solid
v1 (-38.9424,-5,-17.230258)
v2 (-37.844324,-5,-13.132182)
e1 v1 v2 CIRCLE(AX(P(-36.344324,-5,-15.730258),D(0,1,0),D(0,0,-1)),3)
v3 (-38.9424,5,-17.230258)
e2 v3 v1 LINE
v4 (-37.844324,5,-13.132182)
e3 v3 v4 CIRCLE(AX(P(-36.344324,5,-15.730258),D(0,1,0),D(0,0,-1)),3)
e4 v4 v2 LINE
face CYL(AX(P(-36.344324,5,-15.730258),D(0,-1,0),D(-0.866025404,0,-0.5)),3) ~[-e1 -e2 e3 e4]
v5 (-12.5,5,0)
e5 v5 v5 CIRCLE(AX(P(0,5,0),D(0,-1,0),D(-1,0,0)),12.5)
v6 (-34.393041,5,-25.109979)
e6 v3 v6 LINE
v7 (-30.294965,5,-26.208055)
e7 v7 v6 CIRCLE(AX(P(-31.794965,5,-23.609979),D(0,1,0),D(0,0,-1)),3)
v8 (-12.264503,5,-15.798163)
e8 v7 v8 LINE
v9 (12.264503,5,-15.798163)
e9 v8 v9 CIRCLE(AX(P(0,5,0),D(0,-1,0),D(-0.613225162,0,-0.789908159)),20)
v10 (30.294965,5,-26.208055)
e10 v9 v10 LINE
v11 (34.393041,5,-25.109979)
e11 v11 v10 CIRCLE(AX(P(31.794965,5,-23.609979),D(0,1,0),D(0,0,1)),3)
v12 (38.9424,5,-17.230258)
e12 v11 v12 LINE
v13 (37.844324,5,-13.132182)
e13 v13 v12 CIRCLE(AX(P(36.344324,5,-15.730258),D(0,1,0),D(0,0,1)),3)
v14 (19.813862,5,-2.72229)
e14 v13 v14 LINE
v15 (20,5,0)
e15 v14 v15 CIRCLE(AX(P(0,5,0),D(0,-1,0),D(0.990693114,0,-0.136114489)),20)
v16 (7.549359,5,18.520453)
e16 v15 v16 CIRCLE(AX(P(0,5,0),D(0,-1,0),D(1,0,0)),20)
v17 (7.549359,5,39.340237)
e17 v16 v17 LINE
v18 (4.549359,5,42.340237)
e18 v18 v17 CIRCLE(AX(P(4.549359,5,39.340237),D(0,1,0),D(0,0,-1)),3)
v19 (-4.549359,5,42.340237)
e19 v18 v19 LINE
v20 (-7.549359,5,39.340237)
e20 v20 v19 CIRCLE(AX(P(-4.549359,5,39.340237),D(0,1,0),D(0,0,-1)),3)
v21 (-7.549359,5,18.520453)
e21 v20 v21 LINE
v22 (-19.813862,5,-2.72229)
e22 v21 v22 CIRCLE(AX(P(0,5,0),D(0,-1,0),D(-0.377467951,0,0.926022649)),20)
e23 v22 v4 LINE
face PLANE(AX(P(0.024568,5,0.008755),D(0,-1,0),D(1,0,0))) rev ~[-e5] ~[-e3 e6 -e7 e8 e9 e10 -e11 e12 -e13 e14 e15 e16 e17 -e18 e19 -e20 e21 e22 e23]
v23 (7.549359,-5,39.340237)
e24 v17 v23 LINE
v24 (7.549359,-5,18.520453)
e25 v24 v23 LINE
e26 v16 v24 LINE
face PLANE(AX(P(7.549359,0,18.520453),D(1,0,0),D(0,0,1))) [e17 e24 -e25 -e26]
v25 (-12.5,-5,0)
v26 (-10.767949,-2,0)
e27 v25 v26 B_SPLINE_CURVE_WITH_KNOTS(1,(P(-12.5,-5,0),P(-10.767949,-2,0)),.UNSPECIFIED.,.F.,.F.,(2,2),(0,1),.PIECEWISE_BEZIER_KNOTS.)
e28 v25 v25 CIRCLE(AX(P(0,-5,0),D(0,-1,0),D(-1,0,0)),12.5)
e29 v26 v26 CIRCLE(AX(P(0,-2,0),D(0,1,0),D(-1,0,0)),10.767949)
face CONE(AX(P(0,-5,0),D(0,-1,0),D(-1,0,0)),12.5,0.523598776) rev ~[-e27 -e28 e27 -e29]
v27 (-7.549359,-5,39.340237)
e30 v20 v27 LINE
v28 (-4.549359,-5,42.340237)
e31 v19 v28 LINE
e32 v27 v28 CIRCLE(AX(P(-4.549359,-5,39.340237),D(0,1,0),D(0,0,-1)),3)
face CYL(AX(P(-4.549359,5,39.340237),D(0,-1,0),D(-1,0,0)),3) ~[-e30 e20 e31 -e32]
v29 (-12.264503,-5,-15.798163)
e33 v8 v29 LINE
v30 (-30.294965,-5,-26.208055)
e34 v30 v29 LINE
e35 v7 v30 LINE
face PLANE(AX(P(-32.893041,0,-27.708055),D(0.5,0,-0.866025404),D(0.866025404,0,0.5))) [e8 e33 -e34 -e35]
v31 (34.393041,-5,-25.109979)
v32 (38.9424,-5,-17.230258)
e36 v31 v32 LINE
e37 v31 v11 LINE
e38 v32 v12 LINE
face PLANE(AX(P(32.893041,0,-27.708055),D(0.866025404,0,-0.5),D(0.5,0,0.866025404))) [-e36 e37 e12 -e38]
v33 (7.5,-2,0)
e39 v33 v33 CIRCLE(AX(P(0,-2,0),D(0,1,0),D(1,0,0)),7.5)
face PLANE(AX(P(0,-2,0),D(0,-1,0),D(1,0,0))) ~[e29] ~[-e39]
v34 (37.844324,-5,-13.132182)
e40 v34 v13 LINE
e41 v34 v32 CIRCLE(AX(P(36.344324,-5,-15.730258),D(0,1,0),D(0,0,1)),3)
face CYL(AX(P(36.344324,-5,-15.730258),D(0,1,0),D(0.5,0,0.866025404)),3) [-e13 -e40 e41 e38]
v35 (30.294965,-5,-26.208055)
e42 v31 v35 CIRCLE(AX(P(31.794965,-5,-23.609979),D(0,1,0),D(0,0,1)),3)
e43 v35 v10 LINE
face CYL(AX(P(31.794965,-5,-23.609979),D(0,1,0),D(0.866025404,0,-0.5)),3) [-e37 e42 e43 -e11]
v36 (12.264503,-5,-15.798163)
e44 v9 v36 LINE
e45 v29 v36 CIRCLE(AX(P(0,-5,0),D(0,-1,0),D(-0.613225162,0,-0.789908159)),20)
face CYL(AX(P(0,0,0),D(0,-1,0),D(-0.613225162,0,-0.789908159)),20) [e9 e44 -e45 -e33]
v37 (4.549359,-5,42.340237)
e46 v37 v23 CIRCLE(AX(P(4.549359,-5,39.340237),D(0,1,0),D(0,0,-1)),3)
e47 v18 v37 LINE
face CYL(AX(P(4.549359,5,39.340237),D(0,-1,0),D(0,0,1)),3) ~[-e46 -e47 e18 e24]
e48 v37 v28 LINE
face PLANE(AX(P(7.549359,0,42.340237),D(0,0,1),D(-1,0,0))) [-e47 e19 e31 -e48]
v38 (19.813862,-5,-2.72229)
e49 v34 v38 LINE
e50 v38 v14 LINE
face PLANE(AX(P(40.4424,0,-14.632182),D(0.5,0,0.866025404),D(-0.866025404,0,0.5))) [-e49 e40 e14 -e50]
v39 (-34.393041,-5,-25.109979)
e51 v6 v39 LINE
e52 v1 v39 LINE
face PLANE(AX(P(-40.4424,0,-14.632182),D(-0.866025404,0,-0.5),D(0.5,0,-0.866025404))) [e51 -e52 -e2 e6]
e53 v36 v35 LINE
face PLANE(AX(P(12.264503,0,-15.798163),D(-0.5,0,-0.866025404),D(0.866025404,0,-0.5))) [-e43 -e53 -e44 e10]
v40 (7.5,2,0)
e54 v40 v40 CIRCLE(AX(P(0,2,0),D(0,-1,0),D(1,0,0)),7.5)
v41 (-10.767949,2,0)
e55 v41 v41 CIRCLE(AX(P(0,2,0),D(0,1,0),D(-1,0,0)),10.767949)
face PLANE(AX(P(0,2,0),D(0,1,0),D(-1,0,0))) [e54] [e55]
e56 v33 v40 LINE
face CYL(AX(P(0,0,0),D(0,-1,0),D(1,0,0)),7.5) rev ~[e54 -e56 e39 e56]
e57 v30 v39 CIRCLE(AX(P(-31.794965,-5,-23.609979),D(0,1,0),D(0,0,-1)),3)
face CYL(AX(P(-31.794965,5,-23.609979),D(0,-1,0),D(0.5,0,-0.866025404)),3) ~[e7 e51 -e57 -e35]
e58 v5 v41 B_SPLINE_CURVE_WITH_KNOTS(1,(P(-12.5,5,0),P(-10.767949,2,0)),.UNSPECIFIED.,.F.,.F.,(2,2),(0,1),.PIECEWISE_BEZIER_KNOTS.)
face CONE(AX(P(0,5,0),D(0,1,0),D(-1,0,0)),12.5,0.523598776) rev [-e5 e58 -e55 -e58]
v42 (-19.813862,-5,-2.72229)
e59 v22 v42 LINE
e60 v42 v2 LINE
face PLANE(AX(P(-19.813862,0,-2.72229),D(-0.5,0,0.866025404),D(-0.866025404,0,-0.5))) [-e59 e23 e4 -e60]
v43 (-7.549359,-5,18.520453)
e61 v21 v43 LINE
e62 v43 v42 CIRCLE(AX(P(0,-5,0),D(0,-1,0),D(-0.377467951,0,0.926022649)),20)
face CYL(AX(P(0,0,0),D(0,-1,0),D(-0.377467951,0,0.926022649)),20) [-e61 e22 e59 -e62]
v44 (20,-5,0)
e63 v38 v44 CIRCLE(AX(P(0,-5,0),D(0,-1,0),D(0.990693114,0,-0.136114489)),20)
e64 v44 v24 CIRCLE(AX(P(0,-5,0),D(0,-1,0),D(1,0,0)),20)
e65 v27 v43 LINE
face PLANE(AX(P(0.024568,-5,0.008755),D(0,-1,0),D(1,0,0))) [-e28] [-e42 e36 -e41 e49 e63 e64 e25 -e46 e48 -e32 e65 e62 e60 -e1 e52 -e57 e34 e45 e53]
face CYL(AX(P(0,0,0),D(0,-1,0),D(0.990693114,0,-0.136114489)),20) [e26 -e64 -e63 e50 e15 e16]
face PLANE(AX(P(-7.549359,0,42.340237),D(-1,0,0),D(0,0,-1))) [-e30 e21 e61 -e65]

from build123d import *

# Parameters (mm, degrees)
F1_DEPTH = 5
F2_R     = 12.5
F3_DEPTH = 3
F3_TAPER = 30
F4_R     = 7.5
F5_DEPTH = 5.0010001
F6_DEPTH = 5.0010001
F7_R     = 3


# Not quite as in the source:
# - a pattern or mirror of a feature is missing from the dataset's text; its kind, count and spacing are read off the source's solid


with BuildPart() as f1:
    # F0 (on Front) → F1 (new body, symmetric)
    with BuildSketch(Plane.XZ):
        with BuildLine():
            ThreePointArc((19.8138622769, -2.7222897845), (19.9534113066, -1.3643229935), (20, 0))
            ThreePointArc((20, 0), (16.5979995869, 11.1582440246), (7.5493590287, 18.5204529711))
            Line((7.5493590287, 18.5204529711), (-7.5493590287, 18.5204529711))
            ThreePointArc((-7.5493590287, 18.5204529711), (-17.3205080757, 10), (-19.8138622769, -2.7222897845))
            Line((-19.8138622769, -2.7222897845), (-12.2645032483, -15.7981631867))
            ThreePointArc((-12.2645032483, -15.7981631867), (0, -20), (12.2645032483, -15.7981631867))
            Line((12.2645032483, -15.7981631867), (19.8138622769, -2.7222897845))
        make_face()
        with BuildLine():
            Line((-7.5493590287, 18.5204529711), (7.5493590287, 18.5204529711))
            ThreePointArc((7.5493590287, 18.5204529711), (0, 20), (-7.5493590287, 18.5204529711))
        make_face()
        with BuildLine():
            ThreePointArc((-7.5493590287, 18.5204529711), (0, 20), (7.5493590287, 18.5204529711))
            Line((7.5493590287, 18.5204529711), (7.5493590287, 42.3402367583))
            Line((7.5493590287, 42.3402367583), (-7.5493590287, 42.3402367583))
            Line((-7.5493590287, 42.3402367583), (-7.5493590287, 18.5204529711))
        make_face()
        with BuildLine():
            Line((40.4424001493, -14.632181678), (19.8138622769, -2.7222897845))
            ThreePointArc((19.8138622769, -2.7222897845), (17.3205080757, -10), (12.2645032483, -15.7981631867))
            Line((12.2645032483, -15.7981631867), (32.8930411206, -27.7080550803))
            Line((32.8930411206, -27.7080550803), (40.4424001493, -14.632181678))
        make_face()
        with BuildLine():
            ThreePointArc((12.2645032483, -15.7981631867), (17.3205080757, -10), (19.8138622769, -2.7222897845))
            Line((19.8138622769, -2.7222897845), (12.2645032483, -15.7981631867))
        make_face()
        with BuildLine():
            Line((-12.2645032483, -15.7981631867), (-19.8138622769, -2.7222897845))
            ThreePointArc((-19.8138622769, -2.7222897845), (-17.3205080757, -10), (-12.2645032483, -15.7981631867))
        make_face()
        with BuildLine():
            ThreePointArc((-12.2645032483, -15.7981631867), (-17.3205080757, -10), (-19.8138622769, -2.7222897845))
            Line((-19.8138622769, -2.7222897845), (-40.4424001493, -14.632181678))
            Line((-40.4424001493, -14.632181678), (-32.8930411206, -27.7080550803))
            Line((-32.8930411206, -27.7080550803), (-12.2645032483, -15.7981631867))
        make_face()
    extrude(amount=F1_DEPTH, both=True)

    # F2 (on face) → F3 (cut)
    with BuildSketch(Plane(origin=(0, 5, 0), x_dir=(-1, 0, 0), z_dir=(0, 1, 0))):
        Circle(F2_R)
    f3 = extrude(amount=-F3_DEPTH, taper=F3_TAPER, mode=Mode.SUBTRACT)

    # F3_copies: F3 across plane
    add(f3.mirror(Plane(origin=(0, 0, 0), x_dir=(0, 0, -1), z_dir=(0, -1, 0))), mode=Mode.SUBTRACT)

    # F4 (on Front) → F5 (cut, through all)
    with BuildSketch(Plane.XZ):
        Circle(F4_R)
    extrude(amount=-F5_DEPTH, mode=Mode.SUBTRACT)

    # F6 (cut, through all): a face of the model
    f6_faces = [f1.faces().sort_by_distance(p)[0] for p in [
        (0, 0, 0),
    ]]
    extrude(f6_faces, amount=-F6_DEPTH, mode=Mode.SUBTRACT)

    # F7
    f7_edges = [f1.edges().sort_by_distance(p)[0] for p in [
        (-7.549359, 0, 42.340237),
        (7.549359, 0, 42.340237),
        (40.4424, 0, -14.632182),
        (32.893041, 0, -27.708055),
        (-32.893041, 0, -27.708055),
        (-40.4424, 0, -14.632182),
    ]]
    fillet(f7_edges, radius=F7_R)


solid = f1.part
